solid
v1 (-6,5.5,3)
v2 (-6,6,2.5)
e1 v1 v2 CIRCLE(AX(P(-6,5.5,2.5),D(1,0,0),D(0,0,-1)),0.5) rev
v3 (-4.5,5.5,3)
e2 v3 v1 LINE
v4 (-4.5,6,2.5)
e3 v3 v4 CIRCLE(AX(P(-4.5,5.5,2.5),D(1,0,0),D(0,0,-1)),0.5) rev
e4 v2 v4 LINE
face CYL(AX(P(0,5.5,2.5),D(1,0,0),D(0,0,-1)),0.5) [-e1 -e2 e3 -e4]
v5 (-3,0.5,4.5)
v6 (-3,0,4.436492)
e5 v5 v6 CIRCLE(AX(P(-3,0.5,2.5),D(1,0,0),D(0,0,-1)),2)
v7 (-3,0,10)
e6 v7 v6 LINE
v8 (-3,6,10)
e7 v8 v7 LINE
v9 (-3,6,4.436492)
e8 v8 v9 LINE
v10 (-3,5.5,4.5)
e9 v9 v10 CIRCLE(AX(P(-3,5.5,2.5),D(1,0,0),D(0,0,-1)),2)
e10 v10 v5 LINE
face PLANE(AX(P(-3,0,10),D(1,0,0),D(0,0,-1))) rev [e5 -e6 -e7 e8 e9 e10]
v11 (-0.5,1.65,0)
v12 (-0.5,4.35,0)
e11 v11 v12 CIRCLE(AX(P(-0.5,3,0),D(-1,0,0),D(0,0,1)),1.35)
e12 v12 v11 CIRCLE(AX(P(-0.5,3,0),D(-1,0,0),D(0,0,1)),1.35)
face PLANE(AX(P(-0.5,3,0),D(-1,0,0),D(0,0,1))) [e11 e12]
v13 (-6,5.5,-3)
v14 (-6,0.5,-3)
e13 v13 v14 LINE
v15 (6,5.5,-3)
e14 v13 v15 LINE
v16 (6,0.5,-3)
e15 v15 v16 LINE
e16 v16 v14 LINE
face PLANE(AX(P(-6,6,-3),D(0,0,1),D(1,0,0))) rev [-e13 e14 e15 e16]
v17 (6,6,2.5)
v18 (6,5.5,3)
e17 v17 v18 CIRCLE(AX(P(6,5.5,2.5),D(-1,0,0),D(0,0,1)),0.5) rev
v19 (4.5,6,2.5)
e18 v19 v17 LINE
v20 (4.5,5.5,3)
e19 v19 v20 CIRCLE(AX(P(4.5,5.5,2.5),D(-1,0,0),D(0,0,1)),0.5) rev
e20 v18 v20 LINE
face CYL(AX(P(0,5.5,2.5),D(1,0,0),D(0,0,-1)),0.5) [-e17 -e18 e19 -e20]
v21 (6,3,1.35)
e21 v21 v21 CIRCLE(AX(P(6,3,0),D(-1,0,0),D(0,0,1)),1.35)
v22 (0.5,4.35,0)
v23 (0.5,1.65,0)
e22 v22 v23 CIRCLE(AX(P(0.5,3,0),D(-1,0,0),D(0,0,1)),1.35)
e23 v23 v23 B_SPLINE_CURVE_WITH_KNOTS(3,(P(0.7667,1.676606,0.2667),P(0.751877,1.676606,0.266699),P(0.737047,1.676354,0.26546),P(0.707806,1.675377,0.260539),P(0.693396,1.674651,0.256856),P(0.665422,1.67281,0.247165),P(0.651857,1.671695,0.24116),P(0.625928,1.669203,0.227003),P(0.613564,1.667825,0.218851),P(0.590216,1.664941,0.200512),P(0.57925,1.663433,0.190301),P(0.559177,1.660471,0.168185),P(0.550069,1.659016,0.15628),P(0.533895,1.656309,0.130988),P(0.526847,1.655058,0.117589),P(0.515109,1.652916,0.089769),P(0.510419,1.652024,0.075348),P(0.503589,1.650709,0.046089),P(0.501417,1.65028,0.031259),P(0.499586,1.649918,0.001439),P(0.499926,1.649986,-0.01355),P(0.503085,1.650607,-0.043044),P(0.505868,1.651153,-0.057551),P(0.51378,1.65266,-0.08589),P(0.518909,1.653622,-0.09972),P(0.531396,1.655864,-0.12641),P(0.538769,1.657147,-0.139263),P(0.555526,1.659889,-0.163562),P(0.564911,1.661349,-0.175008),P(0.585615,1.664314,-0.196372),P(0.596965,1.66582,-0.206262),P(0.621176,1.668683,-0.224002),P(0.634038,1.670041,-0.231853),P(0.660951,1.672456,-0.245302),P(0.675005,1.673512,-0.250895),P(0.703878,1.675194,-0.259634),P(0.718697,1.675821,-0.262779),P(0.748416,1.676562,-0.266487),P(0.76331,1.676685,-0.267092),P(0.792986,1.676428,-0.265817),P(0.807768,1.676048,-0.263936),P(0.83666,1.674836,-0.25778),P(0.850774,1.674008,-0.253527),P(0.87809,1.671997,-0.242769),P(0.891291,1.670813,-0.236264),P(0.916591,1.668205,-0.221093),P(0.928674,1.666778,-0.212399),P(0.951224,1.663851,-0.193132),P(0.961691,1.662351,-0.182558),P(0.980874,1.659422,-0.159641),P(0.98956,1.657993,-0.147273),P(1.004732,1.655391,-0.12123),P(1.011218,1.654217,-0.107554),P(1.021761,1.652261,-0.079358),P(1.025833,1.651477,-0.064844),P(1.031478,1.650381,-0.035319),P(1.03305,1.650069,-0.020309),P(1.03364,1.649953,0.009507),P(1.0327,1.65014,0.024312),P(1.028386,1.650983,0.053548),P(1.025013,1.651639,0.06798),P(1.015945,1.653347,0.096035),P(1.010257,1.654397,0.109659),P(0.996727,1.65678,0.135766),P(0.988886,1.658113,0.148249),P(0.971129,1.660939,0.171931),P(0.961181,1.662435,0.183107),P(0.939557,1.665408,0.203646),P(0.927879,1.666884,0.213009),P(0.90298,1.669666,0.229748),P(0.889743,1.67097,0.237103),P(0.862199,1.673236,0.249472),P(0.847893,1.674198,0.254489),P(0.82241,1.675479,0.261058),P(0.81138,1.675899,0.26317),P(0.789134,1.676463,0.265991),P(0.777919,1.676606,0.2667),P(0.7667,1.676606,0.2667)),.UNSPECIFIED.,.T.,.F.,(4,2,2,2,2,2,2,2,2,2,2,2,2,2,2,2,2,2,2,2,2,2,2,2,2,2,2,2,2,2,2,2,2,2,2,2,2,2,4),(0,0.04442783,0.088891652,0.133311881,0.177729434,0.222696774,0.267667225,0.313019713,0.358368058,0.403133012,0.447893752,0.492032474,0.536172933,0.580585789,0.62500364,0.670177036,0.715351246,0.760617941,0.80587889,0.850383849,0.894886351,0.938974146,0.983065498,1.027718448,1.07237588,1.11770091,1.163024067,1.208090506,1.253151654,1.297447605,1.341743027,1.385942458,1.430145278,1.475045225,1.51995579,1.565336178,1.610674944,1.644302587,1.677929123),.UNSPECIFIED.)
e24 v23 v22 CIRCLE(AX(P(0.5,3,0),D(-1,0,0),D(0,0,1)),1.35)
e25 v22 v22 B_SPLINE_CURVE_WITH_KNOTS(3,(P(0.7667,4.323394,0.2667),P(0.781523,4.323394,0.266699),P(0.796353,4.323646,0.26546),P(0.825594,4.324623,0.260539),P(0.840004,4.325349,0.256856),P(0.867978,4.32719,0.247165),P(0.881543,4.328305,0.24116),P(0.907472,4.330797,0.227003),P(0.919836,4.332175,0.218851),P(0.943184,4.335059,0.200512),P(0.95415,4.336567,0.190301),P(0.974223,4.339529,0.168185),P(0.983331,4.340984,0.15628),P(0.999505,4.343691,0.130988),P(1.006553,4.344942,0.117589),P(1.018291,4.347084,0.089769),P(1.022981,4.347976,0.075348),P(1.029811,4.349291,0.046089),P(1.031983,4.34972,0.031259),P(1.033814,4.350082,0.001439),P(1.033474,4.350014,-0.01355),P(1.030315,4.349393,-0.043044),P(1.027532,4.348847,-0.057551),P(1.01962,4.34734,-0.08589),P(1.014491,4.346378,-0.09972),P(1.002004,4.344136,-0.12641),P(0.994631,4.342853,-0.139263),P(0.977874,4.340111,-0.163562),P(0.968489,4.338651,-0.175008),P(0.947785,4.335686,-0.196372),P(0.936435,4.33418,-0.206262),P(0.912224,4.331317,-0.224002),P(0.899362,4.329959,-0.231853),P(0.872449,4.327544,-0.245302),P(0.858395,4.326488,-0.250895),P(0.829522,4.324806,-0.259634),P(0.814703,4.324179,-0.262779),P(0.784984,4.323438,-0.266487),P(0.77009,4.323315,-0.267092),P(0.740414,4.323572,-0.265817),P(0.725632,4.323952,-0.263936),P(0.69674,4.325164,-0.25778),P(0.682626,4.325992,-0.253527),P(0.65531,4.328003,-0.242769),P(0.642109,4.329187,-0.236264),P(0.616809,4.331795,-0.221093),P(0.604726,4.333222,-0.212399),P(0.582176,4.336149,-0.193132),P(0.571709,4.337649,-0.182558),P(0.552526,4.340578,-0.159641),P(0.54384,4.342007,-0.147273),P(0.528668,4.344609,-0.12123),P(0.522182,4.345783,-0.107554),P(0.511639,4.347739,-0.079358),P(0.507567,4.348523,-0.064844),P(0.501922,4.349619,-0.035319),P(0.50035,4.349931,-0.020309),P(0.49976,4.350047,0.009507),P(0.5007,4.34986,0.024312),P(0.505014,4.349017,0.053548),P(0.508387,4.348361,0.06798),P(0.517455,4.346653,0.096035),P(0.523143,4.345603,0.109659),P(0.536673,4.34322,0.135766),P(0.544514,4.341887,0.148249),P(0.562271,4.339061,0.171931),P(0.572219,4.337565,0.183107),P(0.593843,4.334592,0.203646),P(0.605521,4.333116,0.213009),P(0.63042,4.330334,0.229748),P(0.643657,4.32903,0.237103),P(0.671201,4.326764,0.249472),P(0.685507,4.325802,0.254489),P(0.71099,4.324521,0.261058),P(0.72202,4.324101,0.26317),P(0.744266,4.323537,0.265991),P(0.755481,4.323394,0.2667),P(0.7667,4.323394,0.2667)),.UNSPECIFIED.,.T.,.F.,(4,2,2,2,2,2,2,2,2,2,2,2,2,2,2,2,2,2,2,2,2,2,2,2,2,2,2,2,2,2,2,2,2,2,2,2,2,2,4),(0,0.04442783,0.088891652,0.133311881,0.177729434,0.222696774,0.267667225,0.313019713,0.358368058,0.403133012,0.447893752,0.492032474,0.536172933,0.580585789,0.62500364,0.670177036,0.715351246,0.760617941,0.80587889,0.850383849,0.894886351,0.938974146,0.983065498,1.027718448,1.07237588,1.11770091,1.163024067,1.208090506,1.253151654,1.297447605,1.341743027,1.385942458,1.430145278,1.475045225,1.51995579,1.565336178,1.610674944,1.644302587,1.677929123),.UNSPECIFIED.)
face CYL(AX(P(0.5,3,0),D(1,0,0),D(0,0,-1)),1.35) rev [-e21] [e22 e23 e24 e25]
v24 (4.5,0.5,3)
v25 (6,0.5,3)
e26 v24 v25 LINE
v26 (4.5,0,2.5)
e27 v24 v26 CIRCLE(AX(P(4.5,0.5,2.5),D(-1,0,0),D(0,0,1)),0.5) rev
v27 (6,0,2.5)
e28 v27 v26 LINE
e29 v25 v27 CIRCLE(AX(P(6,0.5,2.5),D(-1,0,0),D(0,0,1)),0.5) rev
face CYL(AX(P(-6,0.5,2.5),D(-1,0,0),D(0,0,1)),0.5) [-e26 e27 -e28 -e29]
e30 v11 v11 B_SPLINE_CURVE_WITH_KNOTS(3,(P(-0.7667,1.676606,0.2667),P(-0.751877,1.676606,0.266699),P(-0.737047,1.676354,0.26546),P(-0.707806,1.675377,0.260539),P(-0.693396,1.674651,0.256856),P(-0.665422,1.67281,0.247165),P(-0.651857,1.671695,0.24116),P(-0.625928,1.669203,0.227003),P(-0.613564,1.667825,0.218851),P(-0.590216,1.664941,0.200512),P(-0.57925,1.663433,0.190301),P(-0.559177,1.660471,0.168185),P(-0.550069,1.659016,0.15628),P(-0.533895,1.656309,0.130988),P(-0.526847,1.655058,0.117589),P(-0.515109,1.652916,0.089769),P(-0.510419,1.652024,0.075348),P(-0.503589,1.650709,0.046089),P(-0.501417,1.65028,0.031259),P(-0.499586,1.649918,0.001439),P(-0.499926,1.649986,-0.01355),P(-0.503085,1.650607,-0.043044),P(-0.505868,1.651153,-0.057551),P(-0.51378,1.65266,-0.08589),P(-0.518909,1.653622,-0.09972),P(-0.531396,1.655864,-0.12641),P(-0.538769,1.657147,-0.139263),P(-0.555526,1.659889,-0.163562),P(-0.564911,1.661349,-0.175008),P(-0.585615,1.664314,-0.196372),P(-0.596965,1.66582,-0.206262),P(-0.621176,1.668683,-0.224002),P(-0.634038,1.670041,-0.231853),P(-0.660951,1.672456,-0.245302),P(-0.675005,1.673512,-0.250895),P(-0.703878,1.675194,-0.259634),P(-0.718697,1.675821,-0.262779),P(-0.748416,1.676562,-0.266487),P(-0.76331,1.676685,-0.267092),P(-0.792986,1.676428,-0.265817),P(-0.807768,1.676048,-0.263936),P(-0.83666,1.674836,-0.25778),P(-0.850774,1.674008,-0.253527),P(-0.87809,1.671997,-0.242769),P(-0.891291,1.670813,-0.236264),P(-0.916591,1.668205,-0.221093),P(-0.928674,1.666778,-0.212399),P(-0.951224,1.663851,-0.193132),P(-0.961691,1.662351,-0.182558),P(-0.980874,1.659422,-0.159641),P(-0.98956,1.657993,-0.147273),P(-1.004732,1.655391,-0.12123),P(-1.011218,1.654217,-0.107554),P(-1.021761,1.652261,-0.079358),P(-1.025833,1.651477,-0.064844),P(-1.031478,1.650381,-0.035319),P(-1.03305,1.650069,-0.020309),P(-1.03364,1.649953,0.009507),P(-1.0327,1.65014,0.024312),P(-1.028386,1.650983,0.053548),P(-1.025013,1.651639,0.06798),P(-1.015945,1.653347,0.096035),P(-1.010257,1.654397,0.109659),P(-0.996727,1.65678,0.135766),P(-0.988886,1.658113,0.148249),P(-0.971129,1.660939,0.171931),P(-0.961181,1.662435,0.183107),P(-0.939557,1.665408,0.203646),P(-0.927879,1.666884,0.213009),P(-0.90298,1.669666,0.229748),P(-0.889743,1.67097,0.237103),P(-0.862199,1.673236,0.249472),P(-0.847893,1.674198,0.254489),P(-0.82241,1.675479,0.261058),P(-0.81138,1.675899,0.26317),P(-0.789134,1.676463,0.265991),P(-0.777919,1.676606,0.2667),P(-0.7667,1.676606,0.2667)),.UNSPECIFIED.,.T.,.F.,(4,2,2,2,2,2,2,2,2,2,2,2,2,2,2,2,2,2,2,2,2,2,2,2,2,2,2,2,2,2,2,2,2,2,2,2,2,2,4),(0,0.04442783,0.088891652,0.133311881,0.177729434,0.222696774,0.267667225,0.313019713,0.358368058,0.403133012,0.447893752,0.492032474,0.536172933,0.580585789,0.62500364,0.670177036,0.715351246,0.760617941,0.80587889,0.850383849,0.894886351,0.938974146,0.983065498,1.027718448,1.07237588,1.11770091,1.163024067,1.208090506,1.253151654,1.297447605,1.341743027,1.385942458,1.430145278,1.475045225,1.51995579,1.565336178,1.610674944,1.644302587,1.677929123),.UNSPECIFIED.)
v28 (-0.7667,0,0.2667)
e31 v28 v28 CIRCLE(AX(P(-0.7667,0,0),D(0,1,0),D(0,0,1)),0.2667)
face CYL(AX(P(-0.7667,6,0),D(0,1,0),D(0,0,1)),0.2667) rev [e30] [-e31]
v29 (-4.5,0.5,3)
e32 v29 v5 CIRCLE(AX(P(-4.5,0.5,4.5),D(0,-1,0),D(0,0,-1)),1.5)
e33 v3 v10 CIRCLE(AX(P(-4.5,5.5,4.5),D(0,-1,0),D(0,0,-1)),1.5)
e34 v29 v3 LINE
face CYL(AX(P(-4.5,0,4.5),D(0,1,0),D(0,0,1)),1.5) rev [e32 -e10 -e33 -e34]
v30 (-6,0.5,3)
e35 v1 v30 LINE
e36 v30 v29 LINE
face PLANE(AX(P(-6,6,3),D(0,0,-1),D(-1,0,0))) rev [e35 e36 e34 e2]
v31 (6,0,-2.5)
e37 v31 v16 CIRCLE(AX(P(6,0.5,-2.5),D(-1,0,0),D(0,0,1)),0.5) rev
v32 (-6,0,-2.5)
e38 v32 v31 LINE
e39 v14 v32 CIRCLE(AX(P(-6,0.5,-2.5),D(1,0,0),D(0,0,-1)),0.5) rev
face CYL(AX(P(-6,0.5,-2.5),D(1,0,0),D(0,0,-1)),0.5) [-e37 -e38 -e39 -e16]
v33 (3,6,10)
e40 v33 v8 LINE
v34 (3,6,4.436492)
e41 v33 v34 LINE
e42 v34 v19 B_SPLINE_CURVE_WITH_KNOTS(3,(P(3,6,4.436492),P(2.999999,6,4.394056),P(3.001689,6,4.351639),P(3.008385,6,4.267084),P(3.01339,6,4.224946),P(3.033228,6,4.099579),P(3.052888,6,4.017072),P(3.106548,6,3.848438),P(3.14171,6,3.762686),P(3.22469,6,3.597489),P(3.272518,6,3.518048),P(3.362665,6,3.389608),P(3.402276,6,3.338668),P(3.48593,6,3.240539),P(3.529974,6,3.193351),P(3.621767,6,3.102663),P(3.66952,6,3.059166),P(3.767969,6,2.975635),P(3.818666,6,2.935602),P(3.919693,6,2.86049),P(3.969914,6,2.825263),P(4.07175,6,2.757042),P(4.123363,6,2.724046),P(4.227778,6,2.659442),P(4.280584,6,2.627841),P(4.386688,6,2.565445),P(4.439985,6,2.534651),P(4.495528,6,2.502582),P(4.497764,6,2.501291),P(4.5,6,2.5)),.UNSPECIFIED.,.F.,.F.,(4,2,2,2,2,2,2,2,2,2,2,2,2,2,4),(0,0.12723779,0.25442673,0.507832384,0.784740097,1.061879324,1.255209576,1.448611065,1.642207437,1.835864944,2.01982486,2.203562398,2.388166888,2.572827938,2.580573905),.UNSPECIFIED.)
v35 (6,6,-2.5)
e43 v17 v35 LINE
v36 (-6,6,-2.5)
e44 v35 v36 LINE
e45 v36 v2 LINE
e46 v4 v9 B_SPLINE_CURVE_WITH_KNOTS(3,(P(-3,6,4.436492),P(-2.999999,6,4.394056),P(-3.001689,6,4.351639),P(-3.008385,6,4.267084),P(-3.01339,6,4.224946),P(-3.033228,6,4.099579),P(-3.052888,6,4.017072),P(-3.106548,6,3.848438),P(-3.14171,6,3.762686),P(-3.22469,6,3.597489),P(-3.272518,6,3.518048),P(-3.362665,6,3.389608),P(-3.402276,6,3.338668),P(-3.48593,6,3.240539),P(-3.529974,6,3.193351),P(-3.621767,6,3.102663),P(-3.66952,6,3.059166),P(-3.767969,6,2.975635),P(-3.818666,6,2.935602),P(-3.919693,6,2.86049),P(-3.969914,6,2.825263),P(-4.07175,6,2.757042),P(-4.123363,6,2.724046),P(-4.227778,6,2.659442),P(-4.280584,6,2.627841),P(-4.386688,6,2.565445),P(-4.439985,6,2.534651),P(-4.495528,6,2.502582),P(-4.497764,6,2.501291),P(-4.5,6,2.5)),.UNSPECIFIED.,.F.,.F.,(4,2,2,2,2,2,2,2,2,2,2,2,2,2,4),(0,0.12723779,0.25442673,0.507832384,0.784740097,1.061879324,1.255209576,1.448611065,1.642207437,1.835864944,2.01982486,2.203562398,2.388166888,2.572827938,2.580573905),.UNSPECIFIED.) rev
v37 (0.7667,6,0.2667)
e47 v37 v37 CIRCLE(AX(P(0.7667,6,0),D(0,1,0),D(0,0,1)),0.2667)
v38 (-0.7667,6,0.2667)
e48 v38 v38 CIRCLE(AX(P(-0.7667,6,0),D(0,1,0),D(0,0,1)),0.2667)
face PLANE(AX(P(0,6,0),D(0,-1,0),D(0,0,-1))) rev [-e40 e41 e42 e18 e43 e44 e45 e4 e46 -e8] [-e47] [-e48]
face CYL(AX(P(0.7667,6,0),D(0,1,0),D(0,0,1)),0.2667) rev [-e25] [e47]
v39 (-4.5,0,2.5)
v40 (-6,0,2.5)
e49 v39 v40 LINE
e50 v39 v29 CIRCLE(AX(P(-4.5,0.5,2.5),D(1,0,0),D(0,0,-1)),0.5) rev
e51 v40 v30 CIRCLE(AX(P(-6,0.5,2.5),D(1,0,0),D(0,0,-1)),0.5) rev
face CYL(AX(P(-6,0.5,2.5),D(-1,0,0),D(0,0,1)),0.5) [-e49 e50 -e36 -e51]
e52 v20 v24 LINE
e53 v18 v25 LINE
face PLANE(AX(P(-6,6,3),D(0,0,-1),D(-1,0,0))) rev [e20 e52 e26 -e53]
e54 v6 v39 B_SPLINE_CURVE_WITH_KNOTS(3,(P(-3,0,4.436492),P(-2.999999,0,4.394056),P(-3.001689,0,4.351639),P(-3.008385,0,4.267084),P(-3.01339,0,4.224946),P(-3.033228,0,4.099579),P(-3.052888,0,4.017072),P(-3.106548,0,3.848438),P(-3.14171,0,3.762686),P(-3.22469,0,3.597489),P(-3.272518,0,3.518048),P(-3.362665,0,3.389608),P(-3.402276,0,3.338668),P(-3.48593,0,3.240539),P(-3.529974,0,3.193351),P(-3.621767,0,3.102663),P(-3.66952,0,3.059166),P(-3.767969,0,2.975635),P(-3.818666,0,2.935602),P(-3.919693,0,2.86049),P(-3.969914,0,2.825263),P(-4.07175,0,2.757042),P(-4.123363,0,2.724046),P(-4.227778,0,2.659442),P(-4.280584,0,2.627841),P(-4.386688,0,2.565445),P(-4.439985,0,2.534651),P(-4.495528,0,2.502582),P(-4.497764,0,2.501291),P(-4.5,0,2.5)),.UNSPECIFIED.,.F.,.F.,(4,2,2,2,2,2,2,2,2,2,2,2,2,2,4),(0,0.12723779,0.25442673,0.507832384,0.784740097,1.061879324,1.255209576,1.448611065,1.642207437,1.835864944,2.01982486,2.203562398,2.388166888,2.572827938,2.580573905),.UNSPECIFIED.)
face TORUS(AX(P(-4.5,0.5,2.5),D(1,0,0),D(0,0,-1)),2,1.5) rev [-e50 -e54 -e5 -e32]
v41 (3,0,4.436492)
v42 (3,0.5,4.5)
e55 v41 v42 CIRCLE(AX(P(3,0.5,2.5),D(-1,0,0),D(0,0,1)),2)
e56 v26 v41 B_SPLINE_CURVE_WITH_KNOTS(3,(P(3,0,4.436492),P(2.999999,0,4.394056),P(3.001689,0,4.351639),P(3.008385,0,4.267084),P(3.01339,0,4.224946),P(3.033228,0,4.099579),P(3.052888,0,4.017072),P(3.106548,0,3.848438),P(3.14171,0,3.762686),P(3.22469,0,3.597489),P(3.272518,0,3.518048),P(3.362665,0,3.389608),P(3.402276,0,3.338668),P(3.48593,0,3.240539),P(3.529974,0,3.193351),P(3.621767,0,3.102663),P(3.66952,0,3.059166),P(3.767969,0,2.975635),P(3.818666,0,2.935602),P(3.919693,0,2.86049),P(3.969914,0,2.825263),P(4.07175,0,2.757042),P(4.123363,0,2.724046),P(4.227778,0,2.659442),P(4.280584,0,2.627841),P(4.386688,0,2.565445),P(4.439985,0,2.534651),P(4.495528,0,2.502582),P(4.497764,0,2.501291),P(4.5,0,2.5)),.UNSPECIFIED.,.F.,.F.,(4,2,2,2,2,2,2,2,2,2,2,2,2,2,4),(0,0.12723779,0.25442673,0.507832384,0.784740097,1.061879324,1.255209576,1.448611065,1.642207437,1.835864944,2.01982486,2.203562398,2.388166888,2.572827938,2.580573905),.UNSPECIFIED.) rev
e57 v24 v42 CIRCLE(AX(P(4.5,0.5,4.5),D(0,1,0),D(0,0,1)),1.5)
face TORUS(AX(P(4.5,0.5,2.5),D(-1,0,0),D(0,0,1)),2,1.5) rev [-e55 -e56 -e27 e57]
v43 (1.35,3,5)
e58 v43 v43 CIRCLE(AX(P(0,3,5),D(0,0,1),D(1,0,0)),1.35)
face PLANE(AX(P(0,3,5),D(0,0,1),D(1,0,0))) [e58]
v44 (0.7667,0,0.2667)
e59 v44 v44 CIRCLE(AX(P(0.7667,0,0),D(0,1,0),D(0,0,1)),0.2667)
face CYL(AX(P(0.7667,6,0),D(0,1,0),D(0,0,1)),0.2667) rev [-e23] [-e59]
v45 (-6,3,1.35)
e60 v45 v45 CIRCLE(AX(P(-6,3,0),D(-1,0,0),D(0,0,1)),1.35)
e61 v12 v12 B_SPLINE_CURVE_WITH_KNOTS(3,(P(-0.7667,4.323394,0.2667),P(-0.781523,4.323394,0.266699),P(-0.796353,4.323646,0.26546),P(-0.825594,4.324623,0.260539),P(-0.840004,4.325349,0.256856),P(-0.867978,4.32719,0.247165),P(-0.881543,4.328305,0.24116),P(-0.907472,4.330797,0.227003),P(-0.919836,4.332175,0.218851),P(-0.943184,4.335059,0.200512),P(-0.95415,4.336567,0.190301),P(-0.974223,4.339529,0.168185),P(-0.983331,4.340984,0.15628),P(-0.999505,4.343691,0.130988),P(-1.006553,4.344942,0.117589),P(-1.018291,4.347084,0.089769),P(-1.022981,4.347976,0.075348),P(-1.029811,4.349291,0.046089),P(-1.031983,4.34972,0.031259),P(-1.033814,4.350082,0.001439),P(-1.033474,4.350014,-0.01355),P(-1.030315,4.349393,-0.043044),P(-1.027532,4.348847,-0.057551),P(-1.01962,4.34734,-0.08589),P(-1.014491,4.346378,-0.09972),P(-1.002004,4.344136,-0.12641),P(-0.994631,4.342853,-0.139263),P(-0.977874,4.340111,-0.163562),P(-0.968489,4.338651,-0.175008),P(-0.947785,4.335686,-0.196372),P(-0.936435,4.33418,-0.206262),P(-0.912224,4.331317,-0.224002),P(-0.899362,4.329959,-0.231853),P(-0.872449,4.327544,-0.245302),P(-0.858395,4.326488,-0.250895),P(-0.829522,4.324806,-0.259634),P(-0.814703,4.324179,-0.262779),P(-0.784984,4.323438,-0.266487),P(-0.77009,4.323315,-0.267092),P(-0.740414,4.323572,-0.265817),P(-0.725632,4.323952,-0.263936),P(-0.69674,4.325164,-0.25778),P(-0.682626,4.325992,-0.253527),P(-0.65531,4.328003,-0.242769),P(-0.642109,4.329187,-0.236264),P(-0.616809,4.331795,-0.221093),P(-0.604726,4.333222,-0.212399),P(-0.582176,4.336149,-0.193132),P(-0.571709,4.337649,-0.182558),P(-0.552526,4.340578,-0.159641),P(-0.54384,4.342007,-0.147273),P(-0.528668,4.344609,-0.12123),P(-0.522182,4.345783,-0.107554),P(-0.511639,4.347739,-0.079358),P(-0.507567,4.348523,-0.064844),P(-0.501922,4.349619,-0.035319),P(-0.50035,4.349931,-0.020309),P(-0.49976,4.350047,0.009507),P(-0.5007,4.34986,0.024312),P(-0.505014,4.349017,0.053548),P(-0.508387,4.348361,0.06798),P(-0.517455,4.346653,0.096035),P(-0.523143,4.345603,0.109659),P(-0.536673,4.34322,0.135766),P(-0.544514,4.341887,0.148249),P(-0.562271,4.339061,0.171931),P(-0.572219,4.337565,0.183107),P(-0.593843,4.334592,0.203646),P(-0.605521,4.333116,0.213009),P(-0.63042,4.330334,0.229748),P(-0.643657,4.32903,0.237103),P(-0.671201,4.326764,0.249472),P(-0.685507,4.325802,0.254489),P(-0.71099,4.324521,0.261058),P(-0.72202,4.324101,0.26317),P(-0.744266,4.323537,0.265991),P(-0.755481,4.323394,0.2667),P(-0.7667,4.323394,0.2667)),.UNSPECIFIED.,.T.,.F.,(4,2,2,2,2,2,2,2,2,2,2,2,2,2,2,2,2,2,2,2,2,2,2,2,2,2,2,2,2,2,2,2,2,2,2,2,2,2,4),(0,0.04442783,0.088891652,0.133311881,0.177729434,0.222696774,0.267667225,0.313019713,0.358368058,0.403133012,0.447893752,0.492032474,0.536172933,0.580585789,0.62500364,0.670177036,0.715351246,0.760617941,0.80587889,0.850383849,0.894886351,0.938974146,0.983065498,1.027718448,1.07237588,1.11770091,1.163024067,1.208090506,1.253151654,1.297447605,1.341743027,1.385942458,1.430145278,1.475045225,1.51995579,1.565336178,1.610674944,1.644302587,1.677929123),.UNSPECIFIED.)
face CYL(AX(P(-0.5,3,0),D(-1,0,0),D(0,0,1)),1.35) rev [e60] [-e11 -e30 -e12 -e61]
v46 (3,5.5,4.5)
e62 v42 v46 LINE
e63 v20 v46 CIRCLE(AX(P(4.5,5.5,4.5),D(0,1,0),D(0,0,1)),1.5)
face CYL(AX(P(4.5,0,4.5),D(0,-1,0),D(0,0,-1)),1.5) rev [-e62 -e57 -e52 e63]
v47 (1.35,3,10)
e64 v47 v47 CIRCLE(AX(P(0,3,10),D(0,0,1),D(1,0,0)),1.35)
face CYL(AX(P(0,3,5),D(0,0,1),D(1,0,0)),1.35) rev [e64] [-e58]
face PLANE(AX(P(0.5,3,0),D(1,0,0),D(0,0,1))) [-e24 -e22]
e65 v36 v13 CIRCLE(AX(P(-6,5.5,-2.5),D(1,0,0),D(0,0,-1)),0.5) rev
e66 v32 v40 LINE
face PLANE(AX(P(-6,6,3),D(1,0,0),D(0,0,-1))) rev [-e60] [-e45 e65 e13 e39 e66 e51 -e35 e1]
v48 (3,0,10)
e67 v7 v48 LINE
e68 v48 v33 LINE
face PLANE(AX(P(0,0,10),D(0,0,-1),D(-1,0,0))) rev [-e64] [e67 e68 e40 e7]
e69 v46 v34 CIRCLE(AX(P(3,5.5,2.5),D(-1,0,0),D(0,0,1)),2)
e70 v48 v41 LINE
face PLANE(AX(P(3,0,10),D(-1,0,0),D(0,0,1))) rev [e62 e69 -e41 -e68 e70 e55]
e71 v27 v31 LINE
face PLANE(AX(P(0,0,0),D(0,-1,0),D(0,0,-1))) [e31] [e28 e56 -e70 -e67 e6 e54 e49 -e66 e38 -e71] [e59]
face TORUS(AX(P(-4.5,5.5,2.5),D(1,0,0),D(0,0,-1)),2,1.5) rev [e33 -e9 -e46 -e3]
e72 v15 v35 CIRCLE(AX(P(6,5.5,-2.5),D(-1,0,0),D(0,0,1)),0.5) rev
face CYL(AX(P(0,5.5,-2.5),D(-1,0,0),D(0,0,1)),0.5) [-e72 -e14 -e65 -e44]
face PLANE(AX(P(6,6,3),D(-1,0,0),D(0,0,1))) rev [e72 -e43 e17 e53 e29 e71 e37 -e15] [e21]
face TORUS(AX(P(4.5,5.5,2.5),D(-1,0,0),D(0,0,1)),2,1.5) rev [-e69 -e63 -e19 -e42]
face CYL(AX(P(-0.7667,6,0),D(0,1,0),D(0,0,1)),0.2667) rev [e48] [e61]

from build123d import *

# Parameters (mm, degrees)
SKETCH1_W                   = 12
SKETCH1_H                   = 6
BOSS_EXTRUDE1_DEPTH         = 6
F_75_0_021_DIAMETER_HOLE1_D = 0.5334
SKETCH15_W                  = 6
SKETCH15_H                  = 6
BOSS_EXTRUDE2_DEPTH         = 7
FILLET4_R                   = 0.5
FILLET3_R                   = 1.5
SKETCH19_R                  = 1.35
CUT_EXTRUDE1_DEPTH          = 5.5
SKETCH16_R                  = 1.35
CUT_EXTRUDE2_DEPTH          = 5


with BuildPart() as part:
    # Sketch1 → Boss-Extrude1 (new body)
    with BuildSketch(Plane(origin=(0, 0, 0), x_dir=(1, 0, 0), z_dir=(0, 1, 0))):
        Rectangle(SKETCH1_W, SKETCH1_H)
    extrude(amount=BOSS_EXTRUDE1_DEPTH)

    # #75 (0.021) Diameter Hole1 (through all)
    with Locations(Plane(origin=(0, 6, 0), x_dir=(1, 0, 0), z_dir=(0, 1, 0))):
        with Locations((0.7667, 0), (-0.7667, 0)):
            Hole(F_75_0_021_DIAMETER_HOLE1_D / 2)

    # Sketch15 → Boss-Extrude2 (add)
    with BuildSketch(Plane.XY.offset(3)):
        with Locations((0, 3)):
            Rectangle(SKETCH15_W, SKETCH15_H)
    extrude(amount=BOSS_EXTRUDE2_DEPTH)

    # Fillet4
    fillet4_edges = [part.edges().sort_by_distance(p)[0] for p in [
        (4.5, 6, 3),
        (4.5, 0, 3),
        (-4.5, 0, 3),
        (0, 0, -3),
        (0, 6, -3),
        (-4.5, 6, 3),
    ]]
    fillet(fillet4_edges, radius=FILLET4_R)

    # Fillet3
    fillet3_edges = [part.edges().sort_by_distance(p)[0] for p in [
        (-3, 3, 3),
        (-3, 0.146446609, 2.853553391),
        (-3, 5.853553391, 2.853553391),
    ]]
    fillet(fillet3_edges, radius=FILLET3_R)
    fillet3_2_edges = [part.edges().sort_by_distance(p)[0] for p in [
        (3, 5.853553391, 2.853553391),
        (3, 3, 3),
        (3, 0.146446609, 2.853553391),
    ]]
    fillet(fillet3_2_edges, radius=FILLET3_R)

    # Sketch19 → Cut-Extrude1 (cut)
    with BuildSketch(Plane.ZY.offset(6)):
        with Locations((0, 3)):
            Circle(SKETCH19_R)
    cut_extrude1 = extrude(amount=-CUT_EXTRUDE1_DEPTH, mode=Mode.SUBTRACT)

    # Sketch16 → Cut-Extrude2 (cut)
    with BuildSketch(Plane.XY.offset(10)):
        with Locations((0, 3)):
            Circle(SKETCH16_R)
    extrude(amount=-CUT_EXTRUDE2_DEPTH, mode=Mode.SUBTRACT)

    # Mirror2: Cut-Extrude1 across plane
    add(cut_extrude1.mirror(Plane(origin=(0, 0, 0), x_dir=(0, 0, 1), z_dir=(1, 0, 0))), mode=Mode.SUBTRACT)


solid = part.part
